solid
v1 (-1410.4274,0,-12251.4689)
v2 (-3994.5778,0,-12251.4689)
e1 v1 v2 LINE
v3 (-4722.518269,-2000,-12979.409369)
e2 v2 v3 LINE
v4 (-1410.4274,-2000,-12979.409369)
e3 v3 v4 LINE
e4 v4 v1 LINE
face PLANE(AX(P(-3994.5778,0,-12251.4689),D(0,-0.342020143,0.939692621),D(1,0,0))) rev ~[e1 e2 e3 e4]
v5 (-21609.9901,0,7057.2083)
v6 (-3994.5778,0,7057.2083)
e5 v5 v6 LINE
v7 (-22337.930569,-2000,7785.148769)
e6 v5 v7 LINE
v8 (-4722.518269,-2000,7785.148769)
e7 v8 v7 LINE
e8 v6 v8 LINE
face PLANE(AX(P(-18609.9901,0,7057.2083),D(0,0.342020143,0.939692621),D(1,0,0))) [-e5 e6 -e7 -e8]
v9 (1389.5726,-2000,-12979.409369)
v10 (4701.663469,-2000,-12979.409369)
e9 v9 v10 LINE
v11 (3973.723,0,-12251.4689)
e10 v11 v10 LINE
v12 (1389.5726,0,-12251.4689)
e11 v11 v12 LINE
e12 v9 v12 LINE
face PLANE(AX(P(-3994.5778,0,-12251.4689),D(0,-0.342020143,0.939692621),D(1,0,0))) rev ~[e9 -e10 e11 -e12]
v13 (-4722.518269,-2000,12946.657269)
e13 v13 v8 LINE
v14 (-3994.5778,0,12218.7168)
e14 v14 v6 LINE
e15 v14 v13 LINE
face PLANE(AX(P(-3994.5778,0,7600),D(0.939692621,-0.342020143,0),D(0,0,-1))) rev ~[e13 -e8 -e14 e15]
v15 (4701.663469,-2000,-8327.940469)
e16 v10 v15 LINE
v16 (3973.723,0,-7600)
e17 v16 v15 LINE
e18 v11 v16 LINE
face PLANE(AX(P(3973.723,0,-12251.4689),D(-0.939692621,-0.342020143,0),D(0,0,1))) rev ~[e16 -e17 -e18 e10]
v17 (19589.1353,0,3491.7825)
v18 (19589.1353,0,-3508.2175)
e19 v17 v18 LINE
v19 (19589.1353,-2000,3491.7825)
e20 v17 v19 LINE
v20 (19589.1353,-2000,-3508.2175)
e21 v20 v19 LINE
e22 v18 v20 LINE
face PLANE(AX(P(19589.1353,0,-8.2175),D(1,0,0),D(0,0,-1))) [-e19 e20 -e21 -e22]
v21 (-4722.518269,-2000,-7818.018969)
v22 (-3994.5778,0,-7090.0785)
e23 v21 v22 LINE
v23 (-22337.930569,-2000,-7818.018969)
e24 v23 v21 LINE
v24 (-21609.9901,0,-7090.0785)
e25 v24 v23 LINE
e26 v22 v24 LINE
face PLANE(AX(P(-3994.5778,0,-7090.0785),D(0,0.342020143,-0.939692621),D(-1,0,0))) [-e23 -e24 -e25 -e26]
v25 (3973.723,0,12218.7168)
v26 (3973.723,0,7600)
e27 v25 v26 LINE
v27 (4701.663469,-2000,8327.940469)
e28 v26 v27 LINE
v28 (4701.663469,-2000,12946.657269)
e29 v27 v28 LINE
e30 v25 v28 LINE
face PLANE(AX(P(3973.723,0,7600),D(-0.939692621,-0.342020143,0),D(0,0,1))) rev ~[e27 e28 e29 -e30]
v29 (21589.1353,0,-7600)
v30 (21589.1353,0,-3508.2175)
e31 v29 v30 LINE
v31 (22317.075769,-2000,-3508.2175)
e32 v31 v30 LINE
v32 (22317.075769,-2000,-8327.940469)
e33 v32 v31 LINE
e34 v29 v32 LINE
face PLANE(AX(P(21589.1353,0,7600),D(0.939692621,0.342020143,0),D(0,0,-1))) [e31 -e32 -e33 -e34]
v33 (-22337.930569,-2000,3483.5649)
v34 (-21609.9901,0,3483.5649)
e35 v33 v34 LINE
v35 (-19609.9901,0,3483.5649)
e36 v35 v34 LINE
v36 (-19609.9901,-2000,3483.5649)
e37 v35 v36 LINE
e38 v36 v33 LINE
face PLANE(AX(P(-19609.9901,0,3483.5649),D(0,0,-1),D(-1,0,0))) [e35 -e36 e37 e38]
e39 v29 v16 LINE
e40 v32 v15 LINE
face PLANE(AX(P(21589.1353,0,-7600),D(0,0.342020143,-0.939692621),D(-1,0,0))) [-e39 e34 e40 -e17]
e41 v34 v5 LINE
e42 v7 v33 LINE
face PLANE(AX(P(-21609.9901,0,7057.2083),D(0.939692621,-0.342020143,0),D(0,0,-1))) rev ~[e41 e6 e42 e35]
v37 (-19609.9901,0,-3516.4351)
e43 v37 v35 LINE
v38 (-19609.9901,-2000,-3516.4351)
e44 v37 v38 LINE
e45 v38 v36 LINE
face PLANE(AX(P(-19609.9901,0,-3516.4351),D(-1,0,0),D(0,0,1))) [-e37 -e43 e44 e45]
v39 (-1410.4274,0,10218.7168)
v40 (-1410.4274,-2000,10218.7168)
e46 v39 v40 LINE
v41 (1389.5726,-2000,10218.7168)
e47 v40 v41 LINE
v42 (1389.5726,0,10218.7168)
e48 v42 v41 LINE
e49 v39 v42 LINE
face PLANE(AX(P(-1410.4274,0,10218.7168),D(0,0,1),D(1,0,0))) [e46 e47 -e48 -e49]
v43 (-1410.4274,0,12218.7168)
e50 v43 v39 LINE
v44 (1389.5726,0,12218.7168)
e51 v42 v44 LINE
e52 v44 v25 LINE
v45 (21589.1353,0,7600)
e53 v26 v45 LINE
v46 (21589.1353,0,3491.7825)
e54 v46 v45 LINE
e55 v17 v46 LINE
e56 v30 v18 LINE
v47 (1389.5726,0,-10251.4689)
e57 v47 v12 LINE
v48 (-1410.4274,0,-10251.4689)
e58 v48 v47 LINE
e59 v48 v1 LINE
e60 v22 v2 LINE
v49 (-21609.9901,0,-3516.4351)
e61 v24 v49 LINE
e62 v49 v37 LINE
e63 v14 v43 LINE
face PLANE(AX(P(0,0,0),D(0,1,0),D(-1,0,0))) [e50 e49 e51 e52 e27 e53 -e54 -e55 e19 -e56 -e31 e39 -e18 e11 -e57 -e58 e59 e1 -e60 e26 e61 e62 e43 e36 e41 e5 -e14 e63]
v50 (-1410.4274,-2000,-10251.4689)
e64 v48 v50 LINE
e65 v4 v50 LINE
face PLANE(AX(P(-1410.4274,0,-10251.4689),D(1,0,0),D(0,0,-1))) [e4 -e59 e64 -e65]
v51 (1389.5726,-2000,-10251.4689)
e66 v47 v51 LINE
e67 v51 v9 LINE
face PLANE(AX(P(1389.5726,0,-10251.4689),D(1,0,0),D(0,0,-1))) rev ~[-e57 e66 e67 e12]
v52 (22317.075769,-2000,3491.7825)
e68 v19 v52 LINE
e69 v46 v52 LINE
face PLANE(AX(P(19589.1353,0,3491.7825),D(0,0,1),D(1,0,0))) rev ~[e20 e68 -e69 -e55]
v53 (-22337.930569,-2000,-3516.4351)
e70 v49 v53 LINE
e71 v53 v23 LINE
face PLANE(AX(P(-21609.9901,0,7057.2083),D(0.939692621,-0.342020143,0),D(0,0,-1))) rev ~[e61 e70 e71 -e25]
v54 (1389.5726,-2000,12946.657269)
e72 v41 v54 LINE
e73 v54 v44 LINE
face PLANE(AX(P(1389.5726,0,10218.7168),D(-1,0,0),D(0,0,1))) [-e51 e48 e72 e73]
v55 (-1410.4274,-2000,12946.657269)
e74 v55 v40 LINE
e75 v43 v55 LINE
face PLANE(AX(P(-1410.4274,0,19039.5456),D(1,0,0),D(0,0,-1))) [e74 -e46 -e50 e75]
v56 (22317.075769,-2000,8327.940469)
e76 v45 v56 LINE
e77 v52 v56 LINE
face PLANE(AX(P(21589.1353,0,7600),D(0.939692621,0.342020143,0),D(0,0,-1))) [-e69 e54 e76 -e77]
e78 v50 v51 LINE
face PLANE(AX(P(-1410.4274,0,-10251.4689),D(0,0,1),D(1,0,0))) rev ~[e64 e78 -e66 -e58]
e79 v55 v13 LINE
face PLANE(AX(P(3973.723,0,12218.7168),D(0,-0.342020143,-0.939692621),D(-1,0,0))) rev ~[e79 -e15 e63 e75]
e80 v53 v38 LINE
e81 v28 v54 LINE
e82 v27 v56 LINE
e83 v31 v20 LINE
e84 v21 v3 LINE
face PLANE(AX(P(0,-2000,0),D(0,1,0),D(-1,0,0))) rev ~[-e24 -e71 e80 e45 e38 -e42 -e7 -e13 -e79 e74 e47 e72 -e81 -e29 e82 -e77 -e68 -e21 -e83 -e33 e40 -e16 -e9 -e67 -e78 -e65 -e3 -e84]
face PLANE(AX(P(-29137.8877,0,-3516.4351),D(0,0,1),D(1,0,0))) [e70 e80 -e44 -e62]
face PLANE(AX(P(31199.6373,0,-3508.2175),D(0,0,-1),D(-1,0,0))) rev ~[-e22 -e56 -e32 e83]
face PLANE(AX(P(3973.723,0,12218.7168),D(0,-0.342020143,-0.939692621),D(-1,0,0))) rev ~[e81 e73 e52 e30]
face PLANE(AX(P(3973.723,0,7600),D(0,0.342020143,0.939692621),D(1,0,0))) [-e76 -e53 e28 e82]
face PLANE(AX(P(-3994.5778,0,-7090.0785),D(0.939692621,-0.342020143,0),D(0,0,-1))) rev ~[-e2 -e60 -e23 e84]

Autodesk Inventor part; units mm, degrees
ref_plane "YZ Plane" through (0, 0, 0) normal (1, 0, 0) x (0, 1, 0)
ref_plane "XZ Plane" through (0, 0, 0) normal (0, 1, 0) x (-1, 0, 0)
ref_plane "XY Plane" through (0, 0, 0) normal (0, 0, 1) x (1, 0, 0)
sketch "Sketch1" plane through (0, 0, 0) normal (0, 1, 0) x (-1, 0, 0)
  line L0 (-18589.1353, 7057.2083) -> (-18589.1353, -7090.0785)
  line L1 (18609.9901, -7090.0785) -> (18609.9901, 7057.2083)
  line L2 (18609.9901, 7057.2083) -> (21609.9901, 7057.2083)
  line L3 (21609.9901, 7057.2083) -> (21609.9901, -7090.0785)
  line L4 (21609.9901, -7090.0785) -> (18609.9901, -7090.0785)
  line L5 (18609.9901, -7090.0785) -> (18609.9901, 7057.2083)
  line L6 (-18589.1353, 7057.2083) -> (-21589.1353, 7057.2083)
  line L7 (-21589.1353, 7057.2083) -> (-21589.1353, -7090.0785)
  line L8 (-21589.1353, -7090.0785) -> (-18589.1353, -7090.0785)
  line L9 (-18589.1353, -7090.0785) -> (-18589.1353, 7057.2083)
  line L10 (18609.9901, 7057.2083) -> (3994.5778, 7057.2083)
  line L11 (-3973.723, 7057.2083) -> (-18589.1353, 7057.2083)
  line L12 (-18589.1353, -7090.0785) -> (-3973.723, -7090.0785)
  line L13 (3994.5778, -7090.0785) -> (18609.9901, -7090.0785)
  line L14 (3994.5778, -11251.4689) -> (3994.5778, -12251.4689)
  line L15 (3994.5778, -12251.4689) -> (1994.5778, -12251.4689)
  line L16 (-3973.723, 11218.7168) -> (-3973.723, 12218.7168)
  line L17 (-3973.723, 12218.7168) -> (-1973.723, 12218.7168)
  line L18 (3994.5778, -12251.4689) -> (-3973.723, -12251.4689)
  line L19 (-3973.723, -12251.4689) -> (-3973.723, 12218.7168)
  line L20 (-3973.723, 12218.7168) -> (3994.5778, 12218.7168)
  line L21 (3994.5778, 12218.7168) -> (3994.5778, -12251.4689)
  line L22 (21589.1353, 7600) -> (-21589.1353, 7600)
  line L23 (-21589.1353, 7600) -> (-21589.1353, -7600)
  line L24 (-21589.1353, -7600) -> (21589.1353, -7600)
  line L25 (21589.1353, 7600) -> (-21589.1353, -7600) construction
  line L26 (-21589.1353, 7600) -> (21589.1353, -7600) construction
  line L27 (10.4274, -12251.4689) -> (1410.4274, -12251.4689)
  line L28 (1410.4274, -12251.4689) -> (1410.4274, -10251.4689)
  line L29 (1410.4274, -10251.4689) -> (-1389.5726, -10251.4689)
  line L30 (-1389.5726, -10251.4689) -> (-1389.5726, -12251.4689)
  line L31 (10.4274, 12218.7168) -> (1410.4274, 12218.7168)
  line L32 (1410.4274, 12218.7168) -> (1410.4274, 10218.7168)
  line L33 (1410.4274, 10218.7168) -> (-1389.5726, 10218.7168)
  line L34 (-1389.5726, 10218.7168) -> (-1389.5726, 12218.7168)
  line L35 (-21589.1353, 0) -> (-19589.1353, 0)
  line L36 (-19589.1353, 0) -> (-21589.1353, 0)
  line L37 (-21589.1353, 0) -> (-21589.1353, 3500)
  line L38 (21589.1353, 7057.2083) -> (21589.1353, 7600)
  line L39 (21609.9901, -7090.0785) -> (21609.9901, -7600)
  line L40 (21589.1353, -7600) -> (21609.9901, -7600)
  line L41 (21609.9901, -16.4351) -> (21609.9901, -3516.4351)
  line L42 (21609.9901, -3516.4351) -> (19609.9901, -3516.4351)
  line L43 (19609.9901, -3516.4351) -> (19609.9901, 3483.5649)
  line L44 (19609.9901, 3483.5649) -> (21609.9901, 3483.5649)
  line L45 (21609.9901, 3483.5649) -> (21609.9901, -3516.4351)
  line L46 (-21589.1353, 3500) -> (-19589.1353, 3500)
  line L47 (-19589.1353, 3500) -> (-19589.1353, -3500)
  line L48 (-19589.1353, -3500) -> (-21589.1353, -3500)
  line L49 (-21589.1353, -3500) -> (-21589.1353, 3500)
  point P0 (1994.5778, 9218.7168)
  point P1 (1994.5778, -9251.4689)
  point P2 (-1973.723, -9251.4689)
  point P3 (-1973.723, -11251.4689)
  point P4 (0, 0)
  point P5 (3994.5778, -7600)
  point P6 (-3973.723, -7600)
  point P7 (-3973.723, 7600)
  point P8 (3994.5778, 7600)
  point P9 (21589.1353, -7090.0785)
  dimension "d0" = 3000
  dimension "d1" = 3000
  dimension "d12" = 15200
  dimension "d13" = 1400
  dimension "d14" = 2000
  dimension "d15" = 2800
  dimension "d16" = 1400
  dimension "d17" = 2000
  dimension "d18" = 2800
  dimension "d19" = 2000
  dimension "d21" = 3500
  dimension "d22" = 3500
  dimension "d23" = 2000
  dimension "d24" = 7000
  dimension "d27" = 2000
  dimension "d28" = 7000
extrude "Extrusion2" add sketch "Sketch1" against normal blind 2000 draft 20 contours L11 L19 L12 L0 | L0 L8 L7 L48 L47 L46 L6 | L6 L23 L22 L19 L11 | L12 L19 L24 L23 L8 | L19 L22 L21 L24 | L46 L47 L35 L7 | L19 L16 L17 L20 L34 L33 L32 L21 L22 | L7 L35 L47 L48 | L24 L21 L14 L15 L18 L28 L29 L30 L19 | L10 L1 L13 L21 | L30 L29 L28 L18 | L32 L33 L34 L20 | L2 L3 L44 L43 L42 L4 L1 | L3 L42 L43 L44
sketch "Sketch2" plane through (0, 0, 0) normal (0, 1, 0) x (1, 0, 0)
  line L0 (-1410.4274, -10218.7168) -> (1389.5726, -10218.7168) projected
  line L1 (-1410.4274, -10218.7168) -> (1389.5726, -10218.7168)
  line L2 (1389.5726, -10218.7168) -> (1389.5726, -19039.5456)
  line L3 (1389.5726, -19039.5456) -> (-1410.4274, -19039.5456)
  line L4 (-1410.4274, -19039.5456) -> (-1410.4274, -10218.7168)
  line L5 (-1410.4274, 10251.4689) -> (-1410.4274, 12251.4689) projected
  line L6 (-1410.4274, 10251.4689) -> (1389.5726, 10251.4689)
  line L7 (1389.5726, 10251.4689) -> (1389.5726, 17503.4785)
  line L8 (1389.5726, 17503.4785) -> (-1410.4274, 17503.4785)
  line L9 (-1410.4274, 17503.4785) -> (-1410.4274, 10251.4689)
  line L10 (-19609.9901, 3516.4351) -> (-19609.9901, -3483.5649) projected
  line L11 (-19609.9901, -3483.5649) -> (-29137.8877, -3483.5649)
  line L12 (-29137.8877, -3483.5649) -> (-29137.8877, 3516.4351)
  line L13 (-29137.8877, 3516.4351) -> (-19609.9901, 3516.4351)
  line L14 (-19609.9901, 3516.4351) -> (-19609.9901, -3483.5649)
  line L15 (19589.1353, 8.2175) -> (19589.1353, -3491.7825)
  line L16 (19589.1353, 8.2175) -> (19589.1353, 3508.2175)
  line L17 (19589.1353, -3491.7825) -> (31199.6373, -3491.7825)
  line L18 (31199.6373, -3491.7825) -> (31199.6373, 3508.2175)
  line L19 (31199.6373, 3508.2175) -> (19589.1353, 3508.2175)
  point P0 (0, 0)
  point P1 (19589.1353, -3500)
  dimension "d29" = 3500
  dimension "d30" = 3500
extrude "Extrusion3" cut sketch "Sketch2" against normal blind 2000
sketch "Sketch3" plane through (0, 0, 0) normal (0, 1, 0) x (1, 0, 0)
  line L0 (1389.5726, -10218.7168) -> (-1410.4274, -10218.7168) projected
  line L1 (1389.5726, -12946.6572) -> (4701.6634, -12946.6572) projected
  line L2 (-1410.4274, -10218.7168) -> (1389.5726, -10218.7168)
  line L3 (1389.5726, -10218.7168) -> (1389.5726, -12946.6572)
  line L4 (1389.5726, -12946.6572) -> (-1410.4274, -12946.6572)
  line L5 (-1410.4274, -12946.6572) -> (-1410.4274, -10218.7168)
  point P0 (0, 0)
properties part number "main_floor" material "Limestone"
